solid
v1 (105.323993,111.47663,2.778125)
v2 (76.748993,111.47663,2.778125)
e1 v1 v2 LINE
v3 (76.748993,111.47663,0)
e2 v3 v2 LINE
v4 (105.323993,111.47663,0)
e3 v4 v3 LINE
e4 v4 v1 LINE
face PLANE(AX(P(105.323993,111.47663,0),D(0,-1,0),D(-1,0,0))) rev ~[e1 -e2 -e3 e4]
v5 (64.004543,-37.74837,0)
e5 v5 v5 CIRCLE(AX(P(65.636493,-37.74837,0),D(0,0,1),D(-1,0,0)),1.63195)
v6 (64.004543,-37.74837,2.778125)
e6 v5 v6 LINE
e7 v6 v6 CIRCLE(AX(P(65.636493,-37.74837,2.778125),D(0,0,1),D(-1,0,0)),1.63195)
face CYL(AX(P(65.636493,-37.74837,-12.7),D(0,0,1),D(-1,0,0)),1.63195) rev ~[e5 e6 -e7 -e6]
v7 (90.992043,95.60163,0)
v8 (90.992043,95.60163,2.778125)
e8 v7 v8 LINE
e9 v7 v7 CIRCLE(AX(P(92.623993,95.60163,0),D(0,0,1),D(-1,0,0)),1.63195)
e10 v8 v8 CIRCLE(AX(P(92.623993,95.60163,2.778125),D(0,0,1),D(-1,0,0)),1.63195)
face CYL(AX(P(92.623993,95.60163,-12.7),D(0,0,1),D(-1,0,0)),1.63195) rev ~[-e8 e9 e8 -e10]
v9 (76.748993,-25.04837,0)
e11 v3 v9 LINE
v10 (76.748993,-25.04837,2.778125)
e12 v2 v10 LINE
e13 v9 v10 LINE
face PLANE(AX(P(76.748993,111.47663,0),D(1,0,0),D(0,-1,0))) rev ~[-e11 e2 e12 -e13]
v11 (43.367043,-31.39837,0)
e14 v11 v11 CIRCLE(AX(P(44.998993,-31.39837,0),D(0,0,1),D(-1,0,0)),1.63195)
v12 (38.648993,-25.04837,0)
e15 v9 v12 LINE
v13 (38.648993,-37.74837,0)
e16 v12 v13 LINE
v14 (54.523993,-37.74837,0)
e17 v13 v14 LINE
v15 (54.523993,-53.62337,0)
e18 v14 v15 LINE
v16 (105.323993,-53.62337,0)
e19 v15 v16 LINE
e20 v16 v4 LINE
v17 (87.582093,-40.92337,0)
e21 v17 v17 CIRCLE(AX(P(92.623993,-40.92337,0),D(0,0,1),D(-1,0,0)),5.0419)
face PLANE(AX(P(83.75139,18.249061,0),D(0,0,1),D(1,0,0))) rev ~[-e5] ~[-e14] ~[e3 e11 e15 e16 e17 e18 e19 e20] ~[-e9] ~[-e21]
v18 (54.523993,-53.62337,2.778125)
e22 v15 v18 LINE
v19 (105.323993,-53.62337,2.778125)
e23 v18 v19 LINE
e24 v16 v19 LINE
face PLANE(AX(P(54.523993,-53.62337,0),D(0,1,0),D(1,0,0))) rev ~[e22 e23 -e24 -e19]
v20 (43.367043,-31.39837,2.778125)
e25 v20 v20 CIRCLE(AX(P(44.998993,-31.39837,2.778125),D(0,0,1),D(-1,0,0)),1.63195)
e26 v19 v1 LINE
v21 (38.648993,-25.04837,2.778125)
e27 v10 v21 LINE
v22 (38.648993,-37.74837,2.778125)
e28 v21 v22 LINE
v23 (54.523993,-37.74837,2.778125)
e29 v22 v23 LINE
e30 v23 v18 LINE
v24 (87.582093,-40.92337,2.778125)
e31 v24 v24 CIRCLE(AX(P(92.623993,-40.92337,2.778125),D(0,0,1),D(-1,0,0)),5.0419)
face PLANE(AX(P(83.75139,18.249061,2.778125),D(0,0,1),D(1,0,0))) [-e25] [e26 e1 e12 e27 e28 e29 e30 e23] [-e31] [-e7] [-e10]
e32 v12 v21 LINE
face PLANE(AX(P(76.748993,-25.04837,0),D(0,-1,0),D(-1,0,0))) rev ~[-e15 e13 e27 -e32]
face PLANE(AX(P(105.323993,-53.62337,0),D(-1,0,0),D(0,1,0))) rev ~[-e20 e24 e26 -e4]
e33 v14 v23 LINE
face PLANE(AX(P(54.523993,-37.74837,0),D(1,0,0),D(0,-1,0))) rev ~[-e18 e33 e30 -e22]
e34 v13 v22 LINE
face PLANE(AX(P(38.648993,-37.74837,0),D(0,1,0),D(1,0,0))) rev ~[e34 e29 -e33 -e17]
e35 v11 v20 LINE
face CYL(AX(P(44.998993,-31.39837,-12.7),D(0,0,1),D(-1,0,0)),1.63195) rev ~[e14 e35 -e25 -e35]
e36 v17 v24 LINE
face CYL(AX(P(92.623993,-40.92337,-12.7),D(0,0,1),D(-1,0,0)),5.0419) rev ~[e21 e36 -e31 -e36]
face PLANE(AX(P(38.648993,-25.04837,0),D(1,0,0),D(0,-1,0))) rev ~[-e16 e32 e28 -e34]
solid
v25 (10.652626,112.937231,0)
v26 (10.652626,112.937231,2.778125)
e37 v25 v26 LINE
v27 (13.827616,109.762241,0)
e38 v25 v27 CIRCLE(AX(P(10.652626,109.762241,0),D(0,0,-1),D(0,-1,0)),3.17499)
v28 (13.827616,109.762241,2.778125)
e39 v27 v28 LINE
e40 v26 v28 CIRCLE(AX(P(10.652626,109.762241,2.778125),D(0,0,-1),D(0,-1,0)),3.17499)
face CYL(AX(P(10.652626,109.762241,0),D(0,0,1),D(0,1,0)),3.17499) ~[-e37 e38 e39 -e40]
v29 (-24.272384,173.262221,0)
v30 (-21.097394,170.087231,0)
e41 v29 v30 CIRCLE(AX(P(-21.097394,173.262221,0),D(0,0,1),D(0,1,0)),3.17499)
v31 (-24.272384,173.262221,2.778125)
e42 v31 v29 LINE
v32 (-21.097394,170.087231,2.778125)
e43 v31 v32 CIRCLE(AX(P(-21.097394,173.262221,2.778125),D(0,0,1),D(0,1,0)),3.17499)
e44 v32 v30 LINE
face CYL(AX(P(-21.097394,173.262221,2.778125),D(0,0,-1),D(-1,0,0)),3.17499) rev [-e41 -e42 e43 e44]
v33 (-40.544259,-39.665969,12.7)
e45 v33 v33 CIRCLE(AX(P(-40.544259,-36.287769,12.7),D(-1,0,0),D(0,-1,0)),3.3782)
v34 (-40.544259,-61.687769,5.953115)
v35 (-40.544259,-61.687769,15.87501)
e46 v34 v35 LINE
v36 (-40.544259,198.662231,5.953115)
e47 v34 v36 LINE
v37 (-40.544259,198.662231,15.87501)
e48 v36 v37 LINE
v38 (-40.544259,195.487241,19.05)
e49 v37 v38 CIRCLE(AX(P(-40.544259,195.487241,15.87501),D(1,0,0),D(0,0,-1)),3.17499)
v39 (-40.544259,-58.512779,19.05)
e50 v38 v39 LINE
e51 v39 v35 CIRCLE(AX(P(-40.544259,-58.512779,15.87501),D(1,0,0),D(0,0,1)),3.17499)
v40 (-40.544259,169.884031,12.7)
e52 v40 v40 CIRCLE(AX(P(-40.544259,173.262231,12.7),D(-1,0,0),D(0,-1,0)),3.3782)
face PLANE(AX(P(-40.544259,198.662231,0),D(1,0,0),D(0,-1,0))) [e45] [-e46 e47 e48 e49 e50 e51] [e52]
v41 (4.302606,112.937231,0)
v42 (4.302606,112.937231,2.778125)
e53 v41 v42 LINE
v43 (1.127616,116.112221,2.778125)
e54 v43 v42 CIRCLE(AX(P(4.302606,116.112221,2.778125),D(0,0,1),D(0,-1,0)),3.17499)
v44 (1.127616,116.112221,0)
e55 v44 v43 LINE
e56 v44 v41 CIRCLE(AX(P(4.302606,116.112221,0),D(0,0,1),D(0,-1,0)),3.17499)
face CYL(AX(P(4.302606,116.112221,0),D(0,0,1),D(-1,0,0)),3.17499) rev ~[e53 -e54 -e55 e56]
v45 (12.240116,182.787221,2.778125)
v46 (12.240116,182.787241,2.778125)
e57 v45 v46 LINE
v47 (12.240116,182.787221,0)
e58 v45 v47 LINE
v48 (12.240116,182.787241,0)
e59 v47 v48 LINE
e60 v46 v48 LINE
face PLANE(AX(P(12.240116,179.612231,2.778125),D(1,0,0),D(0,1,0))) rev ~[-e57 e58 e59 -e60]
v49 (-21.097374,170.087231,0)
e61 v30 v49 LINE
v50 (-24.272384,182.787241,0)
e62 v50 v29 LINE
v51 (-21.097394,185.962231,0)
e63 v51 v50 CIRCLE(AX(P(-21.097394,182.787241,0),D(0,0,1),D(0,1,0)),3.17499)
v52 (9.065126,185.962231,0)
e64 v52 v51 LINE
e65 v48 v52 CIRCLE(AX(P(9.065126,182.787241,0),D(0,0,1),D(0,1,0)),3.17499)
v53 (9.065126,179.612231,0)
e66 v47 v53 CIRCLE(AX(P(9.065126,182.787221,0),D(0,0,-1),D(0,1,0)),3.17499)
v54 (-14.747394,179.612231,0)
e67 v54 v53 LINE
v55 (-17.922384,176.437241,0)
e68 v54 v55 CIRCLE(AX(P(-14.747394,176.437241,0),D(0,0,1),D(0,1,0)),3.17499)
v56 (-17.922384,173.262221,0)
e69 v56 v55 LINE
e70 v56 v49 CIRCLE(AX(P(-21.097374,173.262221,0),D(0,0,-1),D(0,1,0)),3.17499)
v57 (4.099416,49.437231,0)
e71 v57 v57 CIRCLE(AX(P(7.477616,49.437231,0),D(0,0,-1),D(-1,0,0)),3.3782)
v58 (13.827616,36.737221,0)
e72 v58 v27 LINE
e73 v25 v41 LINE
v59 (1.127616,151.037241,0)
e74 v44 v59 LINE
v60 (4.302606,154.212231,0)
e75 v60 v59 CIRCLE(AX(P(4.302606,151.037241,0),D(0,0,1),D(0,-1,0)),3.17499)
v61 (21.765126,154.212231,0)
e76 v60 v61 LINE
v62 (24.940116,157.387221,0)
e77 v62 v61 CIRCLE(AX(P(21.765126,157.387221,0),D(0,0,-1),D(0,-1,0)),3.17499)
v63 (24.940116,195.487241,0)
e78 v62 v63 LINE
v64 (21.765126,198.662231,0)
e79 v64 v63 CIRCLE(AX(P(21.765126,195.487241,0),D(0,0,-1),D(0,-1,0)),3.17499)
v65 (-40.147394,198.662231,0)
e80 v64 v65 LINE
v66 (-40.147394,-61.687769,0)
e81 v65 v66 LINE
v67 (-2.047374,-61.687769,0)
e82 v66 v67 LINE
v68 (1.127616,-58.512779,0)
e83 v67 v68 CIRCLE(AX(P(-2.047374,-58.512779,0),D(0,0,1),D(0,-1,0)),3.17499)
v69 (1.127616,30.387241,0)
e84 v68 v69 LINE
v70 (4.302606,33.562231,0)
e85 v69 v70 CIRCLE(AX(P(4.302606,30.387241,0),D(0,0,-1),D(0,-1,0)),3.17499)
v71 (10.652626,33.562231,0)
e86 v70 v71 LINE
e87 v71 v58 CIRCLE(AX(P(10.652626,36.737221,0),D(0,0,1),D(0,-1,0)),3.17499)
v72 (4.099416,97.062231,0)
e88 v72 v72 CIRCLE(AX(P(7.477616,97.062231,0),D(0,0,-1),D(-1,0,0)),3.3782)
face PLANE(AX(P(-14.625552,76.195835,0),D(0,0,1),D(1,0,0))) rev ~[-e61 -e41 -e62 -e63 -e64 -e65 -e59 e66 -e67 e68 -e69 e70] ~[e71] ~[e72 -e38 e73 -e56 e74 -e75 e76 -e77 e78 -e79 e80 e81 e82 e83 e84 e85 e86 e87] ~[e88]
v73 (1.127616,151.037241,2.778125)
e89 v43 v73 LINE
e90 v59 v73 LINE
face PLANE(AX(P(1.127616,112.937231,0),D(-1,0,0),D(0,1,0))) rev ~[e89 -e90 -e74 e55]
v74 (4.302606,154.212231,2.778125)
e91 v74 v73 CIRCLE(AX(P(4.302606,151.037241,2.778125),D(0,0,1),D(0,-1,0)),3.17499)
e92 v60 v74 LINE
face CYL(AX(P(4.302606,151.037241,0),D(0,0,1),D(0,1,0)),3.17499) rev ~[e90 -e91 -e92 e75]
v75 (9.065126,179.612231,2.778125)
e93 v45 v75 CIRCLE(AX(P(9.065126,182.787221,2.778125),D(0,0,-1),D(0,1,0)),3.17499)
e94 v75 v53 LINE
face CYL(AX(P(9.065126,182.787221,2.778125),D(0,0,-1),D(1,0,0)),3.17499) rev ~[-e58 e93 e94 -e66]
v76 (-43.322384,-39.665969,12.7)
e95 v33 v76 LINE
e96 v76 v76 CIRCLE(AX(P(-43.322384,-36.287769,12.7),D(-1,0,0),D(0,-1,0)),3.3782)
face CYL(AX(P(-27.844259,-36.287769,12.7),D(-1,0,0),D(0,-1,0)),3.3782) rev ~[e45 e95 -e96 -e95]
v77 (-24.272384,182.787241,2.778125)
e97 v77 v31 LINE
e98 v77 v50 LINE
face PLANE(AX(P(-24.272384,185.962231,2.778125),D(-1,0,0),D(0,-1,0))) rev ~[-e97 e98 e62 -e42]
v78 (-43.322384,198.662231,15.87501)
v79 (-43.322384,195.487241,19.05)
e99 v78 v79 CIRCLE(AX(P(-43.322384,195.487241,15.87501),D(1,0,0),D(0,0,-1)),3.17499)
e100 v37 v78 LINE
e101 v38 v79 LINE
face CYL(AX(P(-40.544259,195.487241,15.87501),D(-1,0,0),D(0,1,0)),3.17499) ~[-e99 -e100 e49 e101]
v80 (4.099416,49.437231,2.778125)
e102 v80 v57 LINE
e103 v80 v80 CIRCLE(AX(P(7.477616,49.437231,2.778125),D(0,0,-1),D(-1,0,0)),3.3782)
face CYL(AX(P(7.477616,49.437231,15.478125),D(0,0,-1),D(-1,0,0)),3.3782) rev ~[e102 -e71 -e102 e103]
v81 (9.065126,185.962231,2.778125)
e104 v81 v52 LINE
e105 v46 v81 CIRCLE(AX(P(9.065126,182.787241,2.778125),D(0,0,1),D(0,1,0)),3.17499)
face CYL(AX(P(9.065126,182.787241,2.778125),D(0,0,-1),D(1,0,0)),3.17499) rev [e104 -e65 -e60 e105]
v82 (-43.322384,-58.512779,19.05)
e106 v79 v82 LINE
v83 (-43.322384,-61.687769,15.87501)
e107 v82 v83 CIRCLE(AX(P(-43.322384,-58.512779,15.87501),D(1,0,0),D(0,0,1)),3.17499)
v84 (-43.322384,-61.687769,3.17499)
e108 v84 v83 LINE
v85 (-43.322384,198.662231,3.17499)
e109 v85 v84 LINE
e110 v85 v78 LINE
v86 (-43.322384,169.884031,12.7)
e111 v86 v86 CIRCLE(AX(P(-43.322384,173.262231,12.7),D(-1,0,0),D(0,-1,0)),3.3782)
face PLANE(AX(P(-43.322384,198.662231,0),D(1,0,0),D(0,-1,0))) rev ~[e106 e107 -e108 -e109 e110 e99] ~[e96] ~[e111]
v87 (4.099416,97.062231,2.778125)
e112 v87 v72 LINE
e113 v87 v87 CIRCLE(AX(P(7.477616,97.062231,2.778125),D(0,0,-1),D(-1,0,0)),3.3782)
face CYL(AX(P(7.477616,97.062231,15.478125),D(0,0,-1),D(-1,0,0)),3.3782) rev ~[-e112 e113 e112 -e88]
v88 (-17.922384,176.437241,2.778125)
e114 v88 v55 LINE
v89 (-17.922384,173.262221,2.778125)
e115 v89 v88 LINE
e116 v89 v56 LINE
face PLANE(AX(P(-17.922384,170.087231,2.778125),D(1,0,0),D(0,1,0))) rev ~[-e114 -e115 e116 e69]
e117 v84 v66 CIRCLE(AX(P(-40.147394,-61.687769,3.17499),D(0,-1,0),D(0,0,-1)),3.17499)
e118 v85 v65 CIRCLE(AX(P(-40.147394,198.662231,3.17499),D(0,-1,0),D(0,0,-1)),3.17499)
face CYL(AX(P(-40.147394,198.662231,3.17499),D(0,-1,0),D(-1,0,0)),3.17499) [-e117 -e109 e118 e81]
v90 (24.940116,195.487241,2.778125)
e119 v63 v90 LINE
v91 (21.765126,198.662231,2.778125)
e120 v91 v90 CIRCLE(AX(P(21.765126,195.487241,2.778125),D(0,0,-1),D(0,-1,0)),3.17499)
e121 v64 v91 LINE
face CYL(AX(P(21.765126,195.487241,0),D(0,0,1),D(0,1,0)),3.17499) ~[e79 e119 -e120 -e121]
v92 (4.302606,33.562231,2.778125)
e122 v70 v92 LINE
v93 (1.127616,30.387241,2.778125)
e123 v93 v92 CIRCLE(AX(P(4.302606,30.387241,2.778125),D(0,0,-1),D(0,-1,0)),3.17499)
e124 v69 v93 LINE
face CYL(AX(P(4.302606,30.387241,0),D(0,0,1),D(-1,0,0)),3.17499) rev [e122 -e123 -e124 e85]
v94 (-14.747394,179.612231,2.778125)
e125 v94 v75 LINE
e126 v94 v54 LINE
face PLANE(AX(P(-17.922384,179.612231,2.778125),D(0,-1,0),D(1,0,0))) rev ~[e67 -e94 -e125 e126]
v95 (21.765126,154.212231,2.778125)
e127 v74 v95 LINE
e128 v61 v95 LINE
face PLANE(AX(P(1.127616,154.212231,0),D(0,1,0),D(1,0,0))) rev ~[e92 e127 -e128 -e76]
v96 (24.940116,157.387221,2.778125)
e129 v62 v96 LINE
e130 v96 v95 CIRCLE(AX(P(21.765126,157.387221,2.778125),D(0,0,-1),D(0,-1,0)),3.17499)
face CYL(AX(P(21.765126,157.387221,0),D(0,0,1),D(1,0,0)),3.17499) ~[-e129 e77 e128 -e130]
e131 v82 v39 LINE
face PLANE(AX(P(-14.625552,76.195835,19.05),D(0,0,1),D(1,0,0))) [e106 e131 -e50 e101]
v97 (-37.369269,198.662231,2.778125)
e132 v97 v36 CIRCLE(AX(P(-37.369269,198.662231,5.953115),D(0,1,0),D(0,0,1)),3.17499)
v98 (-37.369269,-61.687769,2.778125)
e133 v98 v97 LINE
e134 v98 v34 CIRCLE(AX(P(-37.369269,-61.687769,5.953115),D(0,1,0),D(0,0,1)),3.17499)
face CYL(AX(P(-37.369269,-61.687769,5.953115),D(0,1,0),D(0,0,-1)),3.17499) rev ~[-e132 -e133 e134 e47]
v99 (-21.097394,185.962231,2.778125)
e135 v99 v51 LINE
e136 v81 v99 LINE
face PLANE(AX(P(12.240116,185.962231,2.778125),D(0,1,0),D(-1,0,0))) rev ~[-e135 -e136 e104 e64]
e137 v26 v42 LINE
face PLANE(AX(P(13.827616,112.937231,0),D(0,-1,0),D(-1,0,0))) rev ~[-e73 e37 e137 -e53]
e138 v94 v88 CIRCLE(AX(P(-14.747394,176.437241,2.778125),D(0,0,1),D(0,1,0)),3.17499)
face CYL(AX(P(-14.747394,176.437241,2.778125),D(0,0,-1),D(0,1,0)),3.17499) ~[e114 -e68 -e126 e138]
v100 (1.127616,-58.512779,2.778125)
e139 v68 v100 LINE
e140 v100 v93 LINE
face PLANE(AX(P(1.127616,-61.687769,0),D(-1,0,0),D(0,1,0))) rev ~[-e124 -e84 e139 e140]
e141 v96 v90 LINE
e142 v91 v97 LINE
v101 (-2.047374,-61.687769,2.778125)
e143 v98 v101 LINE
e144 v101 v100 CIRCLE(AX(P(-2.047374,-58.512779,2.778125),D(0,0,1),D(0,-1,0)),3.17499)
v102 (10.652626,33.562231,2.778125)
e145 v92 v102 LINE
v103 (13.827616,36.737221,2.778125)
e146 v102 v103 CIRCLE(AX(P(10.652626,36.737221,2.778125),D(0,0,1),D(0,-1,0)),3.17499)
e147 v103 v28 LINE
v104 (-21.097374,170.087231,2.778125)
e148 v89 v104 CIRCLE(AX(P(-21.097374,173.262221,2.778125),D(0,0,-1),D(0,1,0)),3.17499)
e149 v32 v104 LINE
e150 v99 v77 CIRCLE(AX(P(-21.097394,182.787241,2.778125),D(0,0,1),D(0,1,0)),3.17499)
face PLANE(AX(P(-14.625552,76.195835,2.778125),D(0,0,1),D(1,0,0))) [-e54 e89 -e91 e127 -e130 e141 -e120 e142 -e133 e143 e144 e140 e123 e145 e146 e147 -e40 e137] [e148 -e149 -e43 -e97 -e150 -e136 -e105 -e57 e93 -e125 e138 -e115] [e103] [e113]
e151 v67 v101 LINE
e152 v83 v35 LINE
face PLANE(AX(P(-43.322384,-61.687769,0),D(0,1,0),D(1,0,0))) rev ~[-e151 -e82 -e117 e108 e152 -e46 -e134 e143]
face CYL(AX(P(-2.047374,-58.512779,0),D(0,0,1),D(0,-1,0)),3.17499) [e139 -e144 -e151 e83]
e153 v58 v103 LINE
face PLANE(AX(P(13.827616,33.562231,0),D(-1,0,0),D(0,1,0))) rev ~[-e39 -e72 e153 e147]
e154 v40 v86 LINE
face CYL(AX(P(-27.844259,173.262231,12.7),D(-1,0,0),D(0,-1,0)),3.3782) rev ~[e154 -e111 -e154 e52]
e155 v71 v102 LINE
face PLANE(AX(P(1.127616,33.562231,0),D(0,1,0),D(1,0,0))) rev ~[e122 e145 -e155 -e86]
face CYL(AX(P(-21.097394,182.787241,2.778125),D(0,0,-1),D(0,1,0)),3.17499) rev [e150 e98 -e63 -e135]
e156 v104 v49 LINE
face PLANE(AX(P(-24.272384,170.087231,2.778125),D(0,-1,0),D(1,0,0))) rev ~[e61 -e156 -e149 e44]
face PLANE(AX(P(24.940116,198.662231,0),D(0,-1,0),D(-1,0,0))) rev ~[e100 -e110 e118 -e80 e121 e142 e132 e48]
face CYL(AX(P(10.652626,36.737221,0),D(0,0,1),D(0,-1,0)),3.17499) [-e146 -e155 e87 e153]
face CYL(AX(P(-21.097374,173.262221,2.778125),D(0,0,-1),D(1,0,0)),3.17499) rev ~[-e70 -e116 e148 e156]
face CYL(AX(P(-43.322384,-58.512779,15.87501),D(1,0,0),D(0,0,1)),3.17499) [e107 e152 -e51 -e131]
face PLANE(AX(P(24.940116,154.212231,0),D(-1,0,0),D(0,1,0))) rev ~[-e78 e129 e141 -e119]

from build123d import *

# Parameters (mm, degrees)
F1_DEPTH  = 19.05
F2_DEPTH  = 2.778125
F3_T      = -2.778125
F5_DEPTH  = 25.4
F7_D      = 6.7564
F7_DEPTH  = 12.7
F7_TIP    = 2.0298273432
F9_D      = 3.2639
F9_DEPTH  = 12.7
F9_TIP    = 0.9805744872
F12_D     = 6.7564
F12_DEPTH = 12.7
F12_TIP   = 2.0298273432
F13_R     = 3.17499
F14_D     = 10.0838
F14_DEPTH = 12.7
F14_TIP   = 3.0294791551


# Not quite as in the source:
# - a fillet or chamfer is up to 0.001 mm smaller than in the source, because OpenCascade refuses the exact size
# - a feature names something its author has since deleted; it is built from what else it names


with BuildPart() as f1:
    # F0 (on Top) → F1 (new body)
    with BuildSketch(Plane.XY):
        Polygon((24.9401164524, 198.6622305675), (-43.3223835476, 198.6622305675), (-43.3223835476, -61.6877694325), (1.1276164524, -61.6877694325), (1.1276164524, 33.5622305675), (13.8276164524, 33.5622305675), (13.8276164524, 112.9372305675), (1.1276164524, 112.9372305675), (1.1276164524, 154.2122305675), (24.9401164524, 154.2122305675), align=None)
    extrude(amount=F1_DEPTH)

    # F3
    f3_openings = [f1.faces().sort_by_distance(p)[0] for p in [
        (-16.336644, 77.216721, 19.05),
        (13.827616, 73.249731, 9.525),
        (24.940116, 176.437231, 9.525),
        (-21.097384, -61.687769, 9.525),
        (1.127616, -14.062769, 9.525),
        (7.477616, 33.562231, 9.525),
        (7.477616, 112.937231, 9.525),
        (1.127616, 133.574731, 9.525),
        (13.033866, 154.212231, 9.525),
        (-9.191134, 198.662231, 9.525),
    ]]
    offset(amount=F3_T, openings=f3_openings)

    # F4 (on face) → F5 (cut)
    with BuildSketch(Plane.XY.offset(2.778125)):
        Polygon((12.2401164524, 179.6122305675), (12.2401164524, 185.9622305675), (-24.2723835476, 185.9622305675), (-24.2723835476, 170.0872305675), (-17.9223835476, 170.0872305675), (-17.9223835476, 179.6122305675), align=None)
    extrude(amount=-F5_DEPTH, mode=Mode.SUBTRACT)

    # F7
    with Locations(Plane.XY.offset(2.778125)):
        with Locations((7.4776164524, 97.0622305675), (7.4776164524, 49.4372305675)):
            Hole(F7_D / 2, depth=F7_DEPTH)
            with Locations((0, 0, -(F7_DEPTH + F7_TIP / 2))):  # 118° drill point
                Cone(0, F7_D / 2, F7_TIP, mode=Mode.SUBTRACT)

    # F12
    with Locations(Plane.YZ.offset(-40.5442585476)):
        with Locations((-36.2877694325, 12.7), (173.2622305675, 12.7)):
            Hole(F12_D / 2, depth=F12_DEPTH)
            with Locations((0, 0, -(F12_DEPTH + F12_TIP / 2))):  # 118° drill point
                Cone(0, F12_D / 2, F12_TIP, mode=Mode.SUBTRACT)

    # F13 (radius 3.175 in the source; OpenCascade refuses exactly that, so slightly less here)
    f13_edges = [f1.edges().sort_by_distance(p)[0] for p in [
        (-24.272384, 170.087231, 1.389063),
        (-24.272384, 185.962231, 1.389063),
        (-17.922384, 170.087231, 1.389063),
        (-17.922384, 179.612231, 1.389063),
        (12.240116, 185.962231, 1.389063),
        (12.240116, 179.612231, 1.389063),
        (24.940116, 198.662231, 1.389063),
        (1.127616, 112.937231, 1.389063),
        (1.127616, 154.212231, 1.389063),
        (24.940116, 154.212231, 1.389063),
        (13.827616, 112.937231, 1.389063),
        (13.827616, 33.562231, 1.389063),
        (1.127616, 33.562231, 1.389063),
        (1.127616, -61.687769, 1.389063),
        (-40.544259, 68.487231, 2.778125),
        (-41.933321, -61.687769, 19.05),
        (-41.933321, 198.662231, 19.05),
        (-43.322384, 68.487231, 0),
    ]]
    fillet(f13_edges, radius=F13_R)


with BuildPart() as f2:
    # F0 (on Top) → F2 (new body)
    with BuildSketch(Plane.XY):
        Polygon((105.3239927769, -53.6233703196), (105.3239927769, 111.4766296804), (76.7489927769, 111.4766296804), (76.7489927769, -25.0483703196), (38.6489927769, -25.0483703196), (38.6489927769, -37.7483703196), (54.5239927769, -37.7483703196), (54.5239927769, -53.6233703196), align=None)
    extrude(amount=F2_DEPTH)

    # F9
    with Locations(Plane(origin=(0, 0, 0), x_dir=(1, 0, 0), z_dir=(0, 0, -1))):
        with Locations((65.6364927769, 37.7483703196), (44.9989927769, 31.3983703196), (92.6239927769, -95.6016296804)):
            Hole(F9_D / 2, depth=F9_DEPTH)
            with Locations((0, 0, -(F9_DEPTH + F9_TIP / 2))):  # 118° drill point
                Cone(0, F9_D / 2, F9_TIP, mode=Mode.SUBTRACT)

    # F14
    with Locations(Plane(origin=(0, 0, 0), x_dir=(1, 0, 0), z_dir=(0, 0, -1))):
        with Locations((92.6239927769, 40.9233703196)):
            Hole(F14_D / 2, depth=F14_DEPTH)
            with Locations((0, 0, -(F14_DEPTH + F14_TIP / 2))):  # 118° drill point
                Cone(0, F14_D / 2, F14_TIP, mode=Mode.SUBTRACT)


solid = Compound([f1.part, f2.part])
